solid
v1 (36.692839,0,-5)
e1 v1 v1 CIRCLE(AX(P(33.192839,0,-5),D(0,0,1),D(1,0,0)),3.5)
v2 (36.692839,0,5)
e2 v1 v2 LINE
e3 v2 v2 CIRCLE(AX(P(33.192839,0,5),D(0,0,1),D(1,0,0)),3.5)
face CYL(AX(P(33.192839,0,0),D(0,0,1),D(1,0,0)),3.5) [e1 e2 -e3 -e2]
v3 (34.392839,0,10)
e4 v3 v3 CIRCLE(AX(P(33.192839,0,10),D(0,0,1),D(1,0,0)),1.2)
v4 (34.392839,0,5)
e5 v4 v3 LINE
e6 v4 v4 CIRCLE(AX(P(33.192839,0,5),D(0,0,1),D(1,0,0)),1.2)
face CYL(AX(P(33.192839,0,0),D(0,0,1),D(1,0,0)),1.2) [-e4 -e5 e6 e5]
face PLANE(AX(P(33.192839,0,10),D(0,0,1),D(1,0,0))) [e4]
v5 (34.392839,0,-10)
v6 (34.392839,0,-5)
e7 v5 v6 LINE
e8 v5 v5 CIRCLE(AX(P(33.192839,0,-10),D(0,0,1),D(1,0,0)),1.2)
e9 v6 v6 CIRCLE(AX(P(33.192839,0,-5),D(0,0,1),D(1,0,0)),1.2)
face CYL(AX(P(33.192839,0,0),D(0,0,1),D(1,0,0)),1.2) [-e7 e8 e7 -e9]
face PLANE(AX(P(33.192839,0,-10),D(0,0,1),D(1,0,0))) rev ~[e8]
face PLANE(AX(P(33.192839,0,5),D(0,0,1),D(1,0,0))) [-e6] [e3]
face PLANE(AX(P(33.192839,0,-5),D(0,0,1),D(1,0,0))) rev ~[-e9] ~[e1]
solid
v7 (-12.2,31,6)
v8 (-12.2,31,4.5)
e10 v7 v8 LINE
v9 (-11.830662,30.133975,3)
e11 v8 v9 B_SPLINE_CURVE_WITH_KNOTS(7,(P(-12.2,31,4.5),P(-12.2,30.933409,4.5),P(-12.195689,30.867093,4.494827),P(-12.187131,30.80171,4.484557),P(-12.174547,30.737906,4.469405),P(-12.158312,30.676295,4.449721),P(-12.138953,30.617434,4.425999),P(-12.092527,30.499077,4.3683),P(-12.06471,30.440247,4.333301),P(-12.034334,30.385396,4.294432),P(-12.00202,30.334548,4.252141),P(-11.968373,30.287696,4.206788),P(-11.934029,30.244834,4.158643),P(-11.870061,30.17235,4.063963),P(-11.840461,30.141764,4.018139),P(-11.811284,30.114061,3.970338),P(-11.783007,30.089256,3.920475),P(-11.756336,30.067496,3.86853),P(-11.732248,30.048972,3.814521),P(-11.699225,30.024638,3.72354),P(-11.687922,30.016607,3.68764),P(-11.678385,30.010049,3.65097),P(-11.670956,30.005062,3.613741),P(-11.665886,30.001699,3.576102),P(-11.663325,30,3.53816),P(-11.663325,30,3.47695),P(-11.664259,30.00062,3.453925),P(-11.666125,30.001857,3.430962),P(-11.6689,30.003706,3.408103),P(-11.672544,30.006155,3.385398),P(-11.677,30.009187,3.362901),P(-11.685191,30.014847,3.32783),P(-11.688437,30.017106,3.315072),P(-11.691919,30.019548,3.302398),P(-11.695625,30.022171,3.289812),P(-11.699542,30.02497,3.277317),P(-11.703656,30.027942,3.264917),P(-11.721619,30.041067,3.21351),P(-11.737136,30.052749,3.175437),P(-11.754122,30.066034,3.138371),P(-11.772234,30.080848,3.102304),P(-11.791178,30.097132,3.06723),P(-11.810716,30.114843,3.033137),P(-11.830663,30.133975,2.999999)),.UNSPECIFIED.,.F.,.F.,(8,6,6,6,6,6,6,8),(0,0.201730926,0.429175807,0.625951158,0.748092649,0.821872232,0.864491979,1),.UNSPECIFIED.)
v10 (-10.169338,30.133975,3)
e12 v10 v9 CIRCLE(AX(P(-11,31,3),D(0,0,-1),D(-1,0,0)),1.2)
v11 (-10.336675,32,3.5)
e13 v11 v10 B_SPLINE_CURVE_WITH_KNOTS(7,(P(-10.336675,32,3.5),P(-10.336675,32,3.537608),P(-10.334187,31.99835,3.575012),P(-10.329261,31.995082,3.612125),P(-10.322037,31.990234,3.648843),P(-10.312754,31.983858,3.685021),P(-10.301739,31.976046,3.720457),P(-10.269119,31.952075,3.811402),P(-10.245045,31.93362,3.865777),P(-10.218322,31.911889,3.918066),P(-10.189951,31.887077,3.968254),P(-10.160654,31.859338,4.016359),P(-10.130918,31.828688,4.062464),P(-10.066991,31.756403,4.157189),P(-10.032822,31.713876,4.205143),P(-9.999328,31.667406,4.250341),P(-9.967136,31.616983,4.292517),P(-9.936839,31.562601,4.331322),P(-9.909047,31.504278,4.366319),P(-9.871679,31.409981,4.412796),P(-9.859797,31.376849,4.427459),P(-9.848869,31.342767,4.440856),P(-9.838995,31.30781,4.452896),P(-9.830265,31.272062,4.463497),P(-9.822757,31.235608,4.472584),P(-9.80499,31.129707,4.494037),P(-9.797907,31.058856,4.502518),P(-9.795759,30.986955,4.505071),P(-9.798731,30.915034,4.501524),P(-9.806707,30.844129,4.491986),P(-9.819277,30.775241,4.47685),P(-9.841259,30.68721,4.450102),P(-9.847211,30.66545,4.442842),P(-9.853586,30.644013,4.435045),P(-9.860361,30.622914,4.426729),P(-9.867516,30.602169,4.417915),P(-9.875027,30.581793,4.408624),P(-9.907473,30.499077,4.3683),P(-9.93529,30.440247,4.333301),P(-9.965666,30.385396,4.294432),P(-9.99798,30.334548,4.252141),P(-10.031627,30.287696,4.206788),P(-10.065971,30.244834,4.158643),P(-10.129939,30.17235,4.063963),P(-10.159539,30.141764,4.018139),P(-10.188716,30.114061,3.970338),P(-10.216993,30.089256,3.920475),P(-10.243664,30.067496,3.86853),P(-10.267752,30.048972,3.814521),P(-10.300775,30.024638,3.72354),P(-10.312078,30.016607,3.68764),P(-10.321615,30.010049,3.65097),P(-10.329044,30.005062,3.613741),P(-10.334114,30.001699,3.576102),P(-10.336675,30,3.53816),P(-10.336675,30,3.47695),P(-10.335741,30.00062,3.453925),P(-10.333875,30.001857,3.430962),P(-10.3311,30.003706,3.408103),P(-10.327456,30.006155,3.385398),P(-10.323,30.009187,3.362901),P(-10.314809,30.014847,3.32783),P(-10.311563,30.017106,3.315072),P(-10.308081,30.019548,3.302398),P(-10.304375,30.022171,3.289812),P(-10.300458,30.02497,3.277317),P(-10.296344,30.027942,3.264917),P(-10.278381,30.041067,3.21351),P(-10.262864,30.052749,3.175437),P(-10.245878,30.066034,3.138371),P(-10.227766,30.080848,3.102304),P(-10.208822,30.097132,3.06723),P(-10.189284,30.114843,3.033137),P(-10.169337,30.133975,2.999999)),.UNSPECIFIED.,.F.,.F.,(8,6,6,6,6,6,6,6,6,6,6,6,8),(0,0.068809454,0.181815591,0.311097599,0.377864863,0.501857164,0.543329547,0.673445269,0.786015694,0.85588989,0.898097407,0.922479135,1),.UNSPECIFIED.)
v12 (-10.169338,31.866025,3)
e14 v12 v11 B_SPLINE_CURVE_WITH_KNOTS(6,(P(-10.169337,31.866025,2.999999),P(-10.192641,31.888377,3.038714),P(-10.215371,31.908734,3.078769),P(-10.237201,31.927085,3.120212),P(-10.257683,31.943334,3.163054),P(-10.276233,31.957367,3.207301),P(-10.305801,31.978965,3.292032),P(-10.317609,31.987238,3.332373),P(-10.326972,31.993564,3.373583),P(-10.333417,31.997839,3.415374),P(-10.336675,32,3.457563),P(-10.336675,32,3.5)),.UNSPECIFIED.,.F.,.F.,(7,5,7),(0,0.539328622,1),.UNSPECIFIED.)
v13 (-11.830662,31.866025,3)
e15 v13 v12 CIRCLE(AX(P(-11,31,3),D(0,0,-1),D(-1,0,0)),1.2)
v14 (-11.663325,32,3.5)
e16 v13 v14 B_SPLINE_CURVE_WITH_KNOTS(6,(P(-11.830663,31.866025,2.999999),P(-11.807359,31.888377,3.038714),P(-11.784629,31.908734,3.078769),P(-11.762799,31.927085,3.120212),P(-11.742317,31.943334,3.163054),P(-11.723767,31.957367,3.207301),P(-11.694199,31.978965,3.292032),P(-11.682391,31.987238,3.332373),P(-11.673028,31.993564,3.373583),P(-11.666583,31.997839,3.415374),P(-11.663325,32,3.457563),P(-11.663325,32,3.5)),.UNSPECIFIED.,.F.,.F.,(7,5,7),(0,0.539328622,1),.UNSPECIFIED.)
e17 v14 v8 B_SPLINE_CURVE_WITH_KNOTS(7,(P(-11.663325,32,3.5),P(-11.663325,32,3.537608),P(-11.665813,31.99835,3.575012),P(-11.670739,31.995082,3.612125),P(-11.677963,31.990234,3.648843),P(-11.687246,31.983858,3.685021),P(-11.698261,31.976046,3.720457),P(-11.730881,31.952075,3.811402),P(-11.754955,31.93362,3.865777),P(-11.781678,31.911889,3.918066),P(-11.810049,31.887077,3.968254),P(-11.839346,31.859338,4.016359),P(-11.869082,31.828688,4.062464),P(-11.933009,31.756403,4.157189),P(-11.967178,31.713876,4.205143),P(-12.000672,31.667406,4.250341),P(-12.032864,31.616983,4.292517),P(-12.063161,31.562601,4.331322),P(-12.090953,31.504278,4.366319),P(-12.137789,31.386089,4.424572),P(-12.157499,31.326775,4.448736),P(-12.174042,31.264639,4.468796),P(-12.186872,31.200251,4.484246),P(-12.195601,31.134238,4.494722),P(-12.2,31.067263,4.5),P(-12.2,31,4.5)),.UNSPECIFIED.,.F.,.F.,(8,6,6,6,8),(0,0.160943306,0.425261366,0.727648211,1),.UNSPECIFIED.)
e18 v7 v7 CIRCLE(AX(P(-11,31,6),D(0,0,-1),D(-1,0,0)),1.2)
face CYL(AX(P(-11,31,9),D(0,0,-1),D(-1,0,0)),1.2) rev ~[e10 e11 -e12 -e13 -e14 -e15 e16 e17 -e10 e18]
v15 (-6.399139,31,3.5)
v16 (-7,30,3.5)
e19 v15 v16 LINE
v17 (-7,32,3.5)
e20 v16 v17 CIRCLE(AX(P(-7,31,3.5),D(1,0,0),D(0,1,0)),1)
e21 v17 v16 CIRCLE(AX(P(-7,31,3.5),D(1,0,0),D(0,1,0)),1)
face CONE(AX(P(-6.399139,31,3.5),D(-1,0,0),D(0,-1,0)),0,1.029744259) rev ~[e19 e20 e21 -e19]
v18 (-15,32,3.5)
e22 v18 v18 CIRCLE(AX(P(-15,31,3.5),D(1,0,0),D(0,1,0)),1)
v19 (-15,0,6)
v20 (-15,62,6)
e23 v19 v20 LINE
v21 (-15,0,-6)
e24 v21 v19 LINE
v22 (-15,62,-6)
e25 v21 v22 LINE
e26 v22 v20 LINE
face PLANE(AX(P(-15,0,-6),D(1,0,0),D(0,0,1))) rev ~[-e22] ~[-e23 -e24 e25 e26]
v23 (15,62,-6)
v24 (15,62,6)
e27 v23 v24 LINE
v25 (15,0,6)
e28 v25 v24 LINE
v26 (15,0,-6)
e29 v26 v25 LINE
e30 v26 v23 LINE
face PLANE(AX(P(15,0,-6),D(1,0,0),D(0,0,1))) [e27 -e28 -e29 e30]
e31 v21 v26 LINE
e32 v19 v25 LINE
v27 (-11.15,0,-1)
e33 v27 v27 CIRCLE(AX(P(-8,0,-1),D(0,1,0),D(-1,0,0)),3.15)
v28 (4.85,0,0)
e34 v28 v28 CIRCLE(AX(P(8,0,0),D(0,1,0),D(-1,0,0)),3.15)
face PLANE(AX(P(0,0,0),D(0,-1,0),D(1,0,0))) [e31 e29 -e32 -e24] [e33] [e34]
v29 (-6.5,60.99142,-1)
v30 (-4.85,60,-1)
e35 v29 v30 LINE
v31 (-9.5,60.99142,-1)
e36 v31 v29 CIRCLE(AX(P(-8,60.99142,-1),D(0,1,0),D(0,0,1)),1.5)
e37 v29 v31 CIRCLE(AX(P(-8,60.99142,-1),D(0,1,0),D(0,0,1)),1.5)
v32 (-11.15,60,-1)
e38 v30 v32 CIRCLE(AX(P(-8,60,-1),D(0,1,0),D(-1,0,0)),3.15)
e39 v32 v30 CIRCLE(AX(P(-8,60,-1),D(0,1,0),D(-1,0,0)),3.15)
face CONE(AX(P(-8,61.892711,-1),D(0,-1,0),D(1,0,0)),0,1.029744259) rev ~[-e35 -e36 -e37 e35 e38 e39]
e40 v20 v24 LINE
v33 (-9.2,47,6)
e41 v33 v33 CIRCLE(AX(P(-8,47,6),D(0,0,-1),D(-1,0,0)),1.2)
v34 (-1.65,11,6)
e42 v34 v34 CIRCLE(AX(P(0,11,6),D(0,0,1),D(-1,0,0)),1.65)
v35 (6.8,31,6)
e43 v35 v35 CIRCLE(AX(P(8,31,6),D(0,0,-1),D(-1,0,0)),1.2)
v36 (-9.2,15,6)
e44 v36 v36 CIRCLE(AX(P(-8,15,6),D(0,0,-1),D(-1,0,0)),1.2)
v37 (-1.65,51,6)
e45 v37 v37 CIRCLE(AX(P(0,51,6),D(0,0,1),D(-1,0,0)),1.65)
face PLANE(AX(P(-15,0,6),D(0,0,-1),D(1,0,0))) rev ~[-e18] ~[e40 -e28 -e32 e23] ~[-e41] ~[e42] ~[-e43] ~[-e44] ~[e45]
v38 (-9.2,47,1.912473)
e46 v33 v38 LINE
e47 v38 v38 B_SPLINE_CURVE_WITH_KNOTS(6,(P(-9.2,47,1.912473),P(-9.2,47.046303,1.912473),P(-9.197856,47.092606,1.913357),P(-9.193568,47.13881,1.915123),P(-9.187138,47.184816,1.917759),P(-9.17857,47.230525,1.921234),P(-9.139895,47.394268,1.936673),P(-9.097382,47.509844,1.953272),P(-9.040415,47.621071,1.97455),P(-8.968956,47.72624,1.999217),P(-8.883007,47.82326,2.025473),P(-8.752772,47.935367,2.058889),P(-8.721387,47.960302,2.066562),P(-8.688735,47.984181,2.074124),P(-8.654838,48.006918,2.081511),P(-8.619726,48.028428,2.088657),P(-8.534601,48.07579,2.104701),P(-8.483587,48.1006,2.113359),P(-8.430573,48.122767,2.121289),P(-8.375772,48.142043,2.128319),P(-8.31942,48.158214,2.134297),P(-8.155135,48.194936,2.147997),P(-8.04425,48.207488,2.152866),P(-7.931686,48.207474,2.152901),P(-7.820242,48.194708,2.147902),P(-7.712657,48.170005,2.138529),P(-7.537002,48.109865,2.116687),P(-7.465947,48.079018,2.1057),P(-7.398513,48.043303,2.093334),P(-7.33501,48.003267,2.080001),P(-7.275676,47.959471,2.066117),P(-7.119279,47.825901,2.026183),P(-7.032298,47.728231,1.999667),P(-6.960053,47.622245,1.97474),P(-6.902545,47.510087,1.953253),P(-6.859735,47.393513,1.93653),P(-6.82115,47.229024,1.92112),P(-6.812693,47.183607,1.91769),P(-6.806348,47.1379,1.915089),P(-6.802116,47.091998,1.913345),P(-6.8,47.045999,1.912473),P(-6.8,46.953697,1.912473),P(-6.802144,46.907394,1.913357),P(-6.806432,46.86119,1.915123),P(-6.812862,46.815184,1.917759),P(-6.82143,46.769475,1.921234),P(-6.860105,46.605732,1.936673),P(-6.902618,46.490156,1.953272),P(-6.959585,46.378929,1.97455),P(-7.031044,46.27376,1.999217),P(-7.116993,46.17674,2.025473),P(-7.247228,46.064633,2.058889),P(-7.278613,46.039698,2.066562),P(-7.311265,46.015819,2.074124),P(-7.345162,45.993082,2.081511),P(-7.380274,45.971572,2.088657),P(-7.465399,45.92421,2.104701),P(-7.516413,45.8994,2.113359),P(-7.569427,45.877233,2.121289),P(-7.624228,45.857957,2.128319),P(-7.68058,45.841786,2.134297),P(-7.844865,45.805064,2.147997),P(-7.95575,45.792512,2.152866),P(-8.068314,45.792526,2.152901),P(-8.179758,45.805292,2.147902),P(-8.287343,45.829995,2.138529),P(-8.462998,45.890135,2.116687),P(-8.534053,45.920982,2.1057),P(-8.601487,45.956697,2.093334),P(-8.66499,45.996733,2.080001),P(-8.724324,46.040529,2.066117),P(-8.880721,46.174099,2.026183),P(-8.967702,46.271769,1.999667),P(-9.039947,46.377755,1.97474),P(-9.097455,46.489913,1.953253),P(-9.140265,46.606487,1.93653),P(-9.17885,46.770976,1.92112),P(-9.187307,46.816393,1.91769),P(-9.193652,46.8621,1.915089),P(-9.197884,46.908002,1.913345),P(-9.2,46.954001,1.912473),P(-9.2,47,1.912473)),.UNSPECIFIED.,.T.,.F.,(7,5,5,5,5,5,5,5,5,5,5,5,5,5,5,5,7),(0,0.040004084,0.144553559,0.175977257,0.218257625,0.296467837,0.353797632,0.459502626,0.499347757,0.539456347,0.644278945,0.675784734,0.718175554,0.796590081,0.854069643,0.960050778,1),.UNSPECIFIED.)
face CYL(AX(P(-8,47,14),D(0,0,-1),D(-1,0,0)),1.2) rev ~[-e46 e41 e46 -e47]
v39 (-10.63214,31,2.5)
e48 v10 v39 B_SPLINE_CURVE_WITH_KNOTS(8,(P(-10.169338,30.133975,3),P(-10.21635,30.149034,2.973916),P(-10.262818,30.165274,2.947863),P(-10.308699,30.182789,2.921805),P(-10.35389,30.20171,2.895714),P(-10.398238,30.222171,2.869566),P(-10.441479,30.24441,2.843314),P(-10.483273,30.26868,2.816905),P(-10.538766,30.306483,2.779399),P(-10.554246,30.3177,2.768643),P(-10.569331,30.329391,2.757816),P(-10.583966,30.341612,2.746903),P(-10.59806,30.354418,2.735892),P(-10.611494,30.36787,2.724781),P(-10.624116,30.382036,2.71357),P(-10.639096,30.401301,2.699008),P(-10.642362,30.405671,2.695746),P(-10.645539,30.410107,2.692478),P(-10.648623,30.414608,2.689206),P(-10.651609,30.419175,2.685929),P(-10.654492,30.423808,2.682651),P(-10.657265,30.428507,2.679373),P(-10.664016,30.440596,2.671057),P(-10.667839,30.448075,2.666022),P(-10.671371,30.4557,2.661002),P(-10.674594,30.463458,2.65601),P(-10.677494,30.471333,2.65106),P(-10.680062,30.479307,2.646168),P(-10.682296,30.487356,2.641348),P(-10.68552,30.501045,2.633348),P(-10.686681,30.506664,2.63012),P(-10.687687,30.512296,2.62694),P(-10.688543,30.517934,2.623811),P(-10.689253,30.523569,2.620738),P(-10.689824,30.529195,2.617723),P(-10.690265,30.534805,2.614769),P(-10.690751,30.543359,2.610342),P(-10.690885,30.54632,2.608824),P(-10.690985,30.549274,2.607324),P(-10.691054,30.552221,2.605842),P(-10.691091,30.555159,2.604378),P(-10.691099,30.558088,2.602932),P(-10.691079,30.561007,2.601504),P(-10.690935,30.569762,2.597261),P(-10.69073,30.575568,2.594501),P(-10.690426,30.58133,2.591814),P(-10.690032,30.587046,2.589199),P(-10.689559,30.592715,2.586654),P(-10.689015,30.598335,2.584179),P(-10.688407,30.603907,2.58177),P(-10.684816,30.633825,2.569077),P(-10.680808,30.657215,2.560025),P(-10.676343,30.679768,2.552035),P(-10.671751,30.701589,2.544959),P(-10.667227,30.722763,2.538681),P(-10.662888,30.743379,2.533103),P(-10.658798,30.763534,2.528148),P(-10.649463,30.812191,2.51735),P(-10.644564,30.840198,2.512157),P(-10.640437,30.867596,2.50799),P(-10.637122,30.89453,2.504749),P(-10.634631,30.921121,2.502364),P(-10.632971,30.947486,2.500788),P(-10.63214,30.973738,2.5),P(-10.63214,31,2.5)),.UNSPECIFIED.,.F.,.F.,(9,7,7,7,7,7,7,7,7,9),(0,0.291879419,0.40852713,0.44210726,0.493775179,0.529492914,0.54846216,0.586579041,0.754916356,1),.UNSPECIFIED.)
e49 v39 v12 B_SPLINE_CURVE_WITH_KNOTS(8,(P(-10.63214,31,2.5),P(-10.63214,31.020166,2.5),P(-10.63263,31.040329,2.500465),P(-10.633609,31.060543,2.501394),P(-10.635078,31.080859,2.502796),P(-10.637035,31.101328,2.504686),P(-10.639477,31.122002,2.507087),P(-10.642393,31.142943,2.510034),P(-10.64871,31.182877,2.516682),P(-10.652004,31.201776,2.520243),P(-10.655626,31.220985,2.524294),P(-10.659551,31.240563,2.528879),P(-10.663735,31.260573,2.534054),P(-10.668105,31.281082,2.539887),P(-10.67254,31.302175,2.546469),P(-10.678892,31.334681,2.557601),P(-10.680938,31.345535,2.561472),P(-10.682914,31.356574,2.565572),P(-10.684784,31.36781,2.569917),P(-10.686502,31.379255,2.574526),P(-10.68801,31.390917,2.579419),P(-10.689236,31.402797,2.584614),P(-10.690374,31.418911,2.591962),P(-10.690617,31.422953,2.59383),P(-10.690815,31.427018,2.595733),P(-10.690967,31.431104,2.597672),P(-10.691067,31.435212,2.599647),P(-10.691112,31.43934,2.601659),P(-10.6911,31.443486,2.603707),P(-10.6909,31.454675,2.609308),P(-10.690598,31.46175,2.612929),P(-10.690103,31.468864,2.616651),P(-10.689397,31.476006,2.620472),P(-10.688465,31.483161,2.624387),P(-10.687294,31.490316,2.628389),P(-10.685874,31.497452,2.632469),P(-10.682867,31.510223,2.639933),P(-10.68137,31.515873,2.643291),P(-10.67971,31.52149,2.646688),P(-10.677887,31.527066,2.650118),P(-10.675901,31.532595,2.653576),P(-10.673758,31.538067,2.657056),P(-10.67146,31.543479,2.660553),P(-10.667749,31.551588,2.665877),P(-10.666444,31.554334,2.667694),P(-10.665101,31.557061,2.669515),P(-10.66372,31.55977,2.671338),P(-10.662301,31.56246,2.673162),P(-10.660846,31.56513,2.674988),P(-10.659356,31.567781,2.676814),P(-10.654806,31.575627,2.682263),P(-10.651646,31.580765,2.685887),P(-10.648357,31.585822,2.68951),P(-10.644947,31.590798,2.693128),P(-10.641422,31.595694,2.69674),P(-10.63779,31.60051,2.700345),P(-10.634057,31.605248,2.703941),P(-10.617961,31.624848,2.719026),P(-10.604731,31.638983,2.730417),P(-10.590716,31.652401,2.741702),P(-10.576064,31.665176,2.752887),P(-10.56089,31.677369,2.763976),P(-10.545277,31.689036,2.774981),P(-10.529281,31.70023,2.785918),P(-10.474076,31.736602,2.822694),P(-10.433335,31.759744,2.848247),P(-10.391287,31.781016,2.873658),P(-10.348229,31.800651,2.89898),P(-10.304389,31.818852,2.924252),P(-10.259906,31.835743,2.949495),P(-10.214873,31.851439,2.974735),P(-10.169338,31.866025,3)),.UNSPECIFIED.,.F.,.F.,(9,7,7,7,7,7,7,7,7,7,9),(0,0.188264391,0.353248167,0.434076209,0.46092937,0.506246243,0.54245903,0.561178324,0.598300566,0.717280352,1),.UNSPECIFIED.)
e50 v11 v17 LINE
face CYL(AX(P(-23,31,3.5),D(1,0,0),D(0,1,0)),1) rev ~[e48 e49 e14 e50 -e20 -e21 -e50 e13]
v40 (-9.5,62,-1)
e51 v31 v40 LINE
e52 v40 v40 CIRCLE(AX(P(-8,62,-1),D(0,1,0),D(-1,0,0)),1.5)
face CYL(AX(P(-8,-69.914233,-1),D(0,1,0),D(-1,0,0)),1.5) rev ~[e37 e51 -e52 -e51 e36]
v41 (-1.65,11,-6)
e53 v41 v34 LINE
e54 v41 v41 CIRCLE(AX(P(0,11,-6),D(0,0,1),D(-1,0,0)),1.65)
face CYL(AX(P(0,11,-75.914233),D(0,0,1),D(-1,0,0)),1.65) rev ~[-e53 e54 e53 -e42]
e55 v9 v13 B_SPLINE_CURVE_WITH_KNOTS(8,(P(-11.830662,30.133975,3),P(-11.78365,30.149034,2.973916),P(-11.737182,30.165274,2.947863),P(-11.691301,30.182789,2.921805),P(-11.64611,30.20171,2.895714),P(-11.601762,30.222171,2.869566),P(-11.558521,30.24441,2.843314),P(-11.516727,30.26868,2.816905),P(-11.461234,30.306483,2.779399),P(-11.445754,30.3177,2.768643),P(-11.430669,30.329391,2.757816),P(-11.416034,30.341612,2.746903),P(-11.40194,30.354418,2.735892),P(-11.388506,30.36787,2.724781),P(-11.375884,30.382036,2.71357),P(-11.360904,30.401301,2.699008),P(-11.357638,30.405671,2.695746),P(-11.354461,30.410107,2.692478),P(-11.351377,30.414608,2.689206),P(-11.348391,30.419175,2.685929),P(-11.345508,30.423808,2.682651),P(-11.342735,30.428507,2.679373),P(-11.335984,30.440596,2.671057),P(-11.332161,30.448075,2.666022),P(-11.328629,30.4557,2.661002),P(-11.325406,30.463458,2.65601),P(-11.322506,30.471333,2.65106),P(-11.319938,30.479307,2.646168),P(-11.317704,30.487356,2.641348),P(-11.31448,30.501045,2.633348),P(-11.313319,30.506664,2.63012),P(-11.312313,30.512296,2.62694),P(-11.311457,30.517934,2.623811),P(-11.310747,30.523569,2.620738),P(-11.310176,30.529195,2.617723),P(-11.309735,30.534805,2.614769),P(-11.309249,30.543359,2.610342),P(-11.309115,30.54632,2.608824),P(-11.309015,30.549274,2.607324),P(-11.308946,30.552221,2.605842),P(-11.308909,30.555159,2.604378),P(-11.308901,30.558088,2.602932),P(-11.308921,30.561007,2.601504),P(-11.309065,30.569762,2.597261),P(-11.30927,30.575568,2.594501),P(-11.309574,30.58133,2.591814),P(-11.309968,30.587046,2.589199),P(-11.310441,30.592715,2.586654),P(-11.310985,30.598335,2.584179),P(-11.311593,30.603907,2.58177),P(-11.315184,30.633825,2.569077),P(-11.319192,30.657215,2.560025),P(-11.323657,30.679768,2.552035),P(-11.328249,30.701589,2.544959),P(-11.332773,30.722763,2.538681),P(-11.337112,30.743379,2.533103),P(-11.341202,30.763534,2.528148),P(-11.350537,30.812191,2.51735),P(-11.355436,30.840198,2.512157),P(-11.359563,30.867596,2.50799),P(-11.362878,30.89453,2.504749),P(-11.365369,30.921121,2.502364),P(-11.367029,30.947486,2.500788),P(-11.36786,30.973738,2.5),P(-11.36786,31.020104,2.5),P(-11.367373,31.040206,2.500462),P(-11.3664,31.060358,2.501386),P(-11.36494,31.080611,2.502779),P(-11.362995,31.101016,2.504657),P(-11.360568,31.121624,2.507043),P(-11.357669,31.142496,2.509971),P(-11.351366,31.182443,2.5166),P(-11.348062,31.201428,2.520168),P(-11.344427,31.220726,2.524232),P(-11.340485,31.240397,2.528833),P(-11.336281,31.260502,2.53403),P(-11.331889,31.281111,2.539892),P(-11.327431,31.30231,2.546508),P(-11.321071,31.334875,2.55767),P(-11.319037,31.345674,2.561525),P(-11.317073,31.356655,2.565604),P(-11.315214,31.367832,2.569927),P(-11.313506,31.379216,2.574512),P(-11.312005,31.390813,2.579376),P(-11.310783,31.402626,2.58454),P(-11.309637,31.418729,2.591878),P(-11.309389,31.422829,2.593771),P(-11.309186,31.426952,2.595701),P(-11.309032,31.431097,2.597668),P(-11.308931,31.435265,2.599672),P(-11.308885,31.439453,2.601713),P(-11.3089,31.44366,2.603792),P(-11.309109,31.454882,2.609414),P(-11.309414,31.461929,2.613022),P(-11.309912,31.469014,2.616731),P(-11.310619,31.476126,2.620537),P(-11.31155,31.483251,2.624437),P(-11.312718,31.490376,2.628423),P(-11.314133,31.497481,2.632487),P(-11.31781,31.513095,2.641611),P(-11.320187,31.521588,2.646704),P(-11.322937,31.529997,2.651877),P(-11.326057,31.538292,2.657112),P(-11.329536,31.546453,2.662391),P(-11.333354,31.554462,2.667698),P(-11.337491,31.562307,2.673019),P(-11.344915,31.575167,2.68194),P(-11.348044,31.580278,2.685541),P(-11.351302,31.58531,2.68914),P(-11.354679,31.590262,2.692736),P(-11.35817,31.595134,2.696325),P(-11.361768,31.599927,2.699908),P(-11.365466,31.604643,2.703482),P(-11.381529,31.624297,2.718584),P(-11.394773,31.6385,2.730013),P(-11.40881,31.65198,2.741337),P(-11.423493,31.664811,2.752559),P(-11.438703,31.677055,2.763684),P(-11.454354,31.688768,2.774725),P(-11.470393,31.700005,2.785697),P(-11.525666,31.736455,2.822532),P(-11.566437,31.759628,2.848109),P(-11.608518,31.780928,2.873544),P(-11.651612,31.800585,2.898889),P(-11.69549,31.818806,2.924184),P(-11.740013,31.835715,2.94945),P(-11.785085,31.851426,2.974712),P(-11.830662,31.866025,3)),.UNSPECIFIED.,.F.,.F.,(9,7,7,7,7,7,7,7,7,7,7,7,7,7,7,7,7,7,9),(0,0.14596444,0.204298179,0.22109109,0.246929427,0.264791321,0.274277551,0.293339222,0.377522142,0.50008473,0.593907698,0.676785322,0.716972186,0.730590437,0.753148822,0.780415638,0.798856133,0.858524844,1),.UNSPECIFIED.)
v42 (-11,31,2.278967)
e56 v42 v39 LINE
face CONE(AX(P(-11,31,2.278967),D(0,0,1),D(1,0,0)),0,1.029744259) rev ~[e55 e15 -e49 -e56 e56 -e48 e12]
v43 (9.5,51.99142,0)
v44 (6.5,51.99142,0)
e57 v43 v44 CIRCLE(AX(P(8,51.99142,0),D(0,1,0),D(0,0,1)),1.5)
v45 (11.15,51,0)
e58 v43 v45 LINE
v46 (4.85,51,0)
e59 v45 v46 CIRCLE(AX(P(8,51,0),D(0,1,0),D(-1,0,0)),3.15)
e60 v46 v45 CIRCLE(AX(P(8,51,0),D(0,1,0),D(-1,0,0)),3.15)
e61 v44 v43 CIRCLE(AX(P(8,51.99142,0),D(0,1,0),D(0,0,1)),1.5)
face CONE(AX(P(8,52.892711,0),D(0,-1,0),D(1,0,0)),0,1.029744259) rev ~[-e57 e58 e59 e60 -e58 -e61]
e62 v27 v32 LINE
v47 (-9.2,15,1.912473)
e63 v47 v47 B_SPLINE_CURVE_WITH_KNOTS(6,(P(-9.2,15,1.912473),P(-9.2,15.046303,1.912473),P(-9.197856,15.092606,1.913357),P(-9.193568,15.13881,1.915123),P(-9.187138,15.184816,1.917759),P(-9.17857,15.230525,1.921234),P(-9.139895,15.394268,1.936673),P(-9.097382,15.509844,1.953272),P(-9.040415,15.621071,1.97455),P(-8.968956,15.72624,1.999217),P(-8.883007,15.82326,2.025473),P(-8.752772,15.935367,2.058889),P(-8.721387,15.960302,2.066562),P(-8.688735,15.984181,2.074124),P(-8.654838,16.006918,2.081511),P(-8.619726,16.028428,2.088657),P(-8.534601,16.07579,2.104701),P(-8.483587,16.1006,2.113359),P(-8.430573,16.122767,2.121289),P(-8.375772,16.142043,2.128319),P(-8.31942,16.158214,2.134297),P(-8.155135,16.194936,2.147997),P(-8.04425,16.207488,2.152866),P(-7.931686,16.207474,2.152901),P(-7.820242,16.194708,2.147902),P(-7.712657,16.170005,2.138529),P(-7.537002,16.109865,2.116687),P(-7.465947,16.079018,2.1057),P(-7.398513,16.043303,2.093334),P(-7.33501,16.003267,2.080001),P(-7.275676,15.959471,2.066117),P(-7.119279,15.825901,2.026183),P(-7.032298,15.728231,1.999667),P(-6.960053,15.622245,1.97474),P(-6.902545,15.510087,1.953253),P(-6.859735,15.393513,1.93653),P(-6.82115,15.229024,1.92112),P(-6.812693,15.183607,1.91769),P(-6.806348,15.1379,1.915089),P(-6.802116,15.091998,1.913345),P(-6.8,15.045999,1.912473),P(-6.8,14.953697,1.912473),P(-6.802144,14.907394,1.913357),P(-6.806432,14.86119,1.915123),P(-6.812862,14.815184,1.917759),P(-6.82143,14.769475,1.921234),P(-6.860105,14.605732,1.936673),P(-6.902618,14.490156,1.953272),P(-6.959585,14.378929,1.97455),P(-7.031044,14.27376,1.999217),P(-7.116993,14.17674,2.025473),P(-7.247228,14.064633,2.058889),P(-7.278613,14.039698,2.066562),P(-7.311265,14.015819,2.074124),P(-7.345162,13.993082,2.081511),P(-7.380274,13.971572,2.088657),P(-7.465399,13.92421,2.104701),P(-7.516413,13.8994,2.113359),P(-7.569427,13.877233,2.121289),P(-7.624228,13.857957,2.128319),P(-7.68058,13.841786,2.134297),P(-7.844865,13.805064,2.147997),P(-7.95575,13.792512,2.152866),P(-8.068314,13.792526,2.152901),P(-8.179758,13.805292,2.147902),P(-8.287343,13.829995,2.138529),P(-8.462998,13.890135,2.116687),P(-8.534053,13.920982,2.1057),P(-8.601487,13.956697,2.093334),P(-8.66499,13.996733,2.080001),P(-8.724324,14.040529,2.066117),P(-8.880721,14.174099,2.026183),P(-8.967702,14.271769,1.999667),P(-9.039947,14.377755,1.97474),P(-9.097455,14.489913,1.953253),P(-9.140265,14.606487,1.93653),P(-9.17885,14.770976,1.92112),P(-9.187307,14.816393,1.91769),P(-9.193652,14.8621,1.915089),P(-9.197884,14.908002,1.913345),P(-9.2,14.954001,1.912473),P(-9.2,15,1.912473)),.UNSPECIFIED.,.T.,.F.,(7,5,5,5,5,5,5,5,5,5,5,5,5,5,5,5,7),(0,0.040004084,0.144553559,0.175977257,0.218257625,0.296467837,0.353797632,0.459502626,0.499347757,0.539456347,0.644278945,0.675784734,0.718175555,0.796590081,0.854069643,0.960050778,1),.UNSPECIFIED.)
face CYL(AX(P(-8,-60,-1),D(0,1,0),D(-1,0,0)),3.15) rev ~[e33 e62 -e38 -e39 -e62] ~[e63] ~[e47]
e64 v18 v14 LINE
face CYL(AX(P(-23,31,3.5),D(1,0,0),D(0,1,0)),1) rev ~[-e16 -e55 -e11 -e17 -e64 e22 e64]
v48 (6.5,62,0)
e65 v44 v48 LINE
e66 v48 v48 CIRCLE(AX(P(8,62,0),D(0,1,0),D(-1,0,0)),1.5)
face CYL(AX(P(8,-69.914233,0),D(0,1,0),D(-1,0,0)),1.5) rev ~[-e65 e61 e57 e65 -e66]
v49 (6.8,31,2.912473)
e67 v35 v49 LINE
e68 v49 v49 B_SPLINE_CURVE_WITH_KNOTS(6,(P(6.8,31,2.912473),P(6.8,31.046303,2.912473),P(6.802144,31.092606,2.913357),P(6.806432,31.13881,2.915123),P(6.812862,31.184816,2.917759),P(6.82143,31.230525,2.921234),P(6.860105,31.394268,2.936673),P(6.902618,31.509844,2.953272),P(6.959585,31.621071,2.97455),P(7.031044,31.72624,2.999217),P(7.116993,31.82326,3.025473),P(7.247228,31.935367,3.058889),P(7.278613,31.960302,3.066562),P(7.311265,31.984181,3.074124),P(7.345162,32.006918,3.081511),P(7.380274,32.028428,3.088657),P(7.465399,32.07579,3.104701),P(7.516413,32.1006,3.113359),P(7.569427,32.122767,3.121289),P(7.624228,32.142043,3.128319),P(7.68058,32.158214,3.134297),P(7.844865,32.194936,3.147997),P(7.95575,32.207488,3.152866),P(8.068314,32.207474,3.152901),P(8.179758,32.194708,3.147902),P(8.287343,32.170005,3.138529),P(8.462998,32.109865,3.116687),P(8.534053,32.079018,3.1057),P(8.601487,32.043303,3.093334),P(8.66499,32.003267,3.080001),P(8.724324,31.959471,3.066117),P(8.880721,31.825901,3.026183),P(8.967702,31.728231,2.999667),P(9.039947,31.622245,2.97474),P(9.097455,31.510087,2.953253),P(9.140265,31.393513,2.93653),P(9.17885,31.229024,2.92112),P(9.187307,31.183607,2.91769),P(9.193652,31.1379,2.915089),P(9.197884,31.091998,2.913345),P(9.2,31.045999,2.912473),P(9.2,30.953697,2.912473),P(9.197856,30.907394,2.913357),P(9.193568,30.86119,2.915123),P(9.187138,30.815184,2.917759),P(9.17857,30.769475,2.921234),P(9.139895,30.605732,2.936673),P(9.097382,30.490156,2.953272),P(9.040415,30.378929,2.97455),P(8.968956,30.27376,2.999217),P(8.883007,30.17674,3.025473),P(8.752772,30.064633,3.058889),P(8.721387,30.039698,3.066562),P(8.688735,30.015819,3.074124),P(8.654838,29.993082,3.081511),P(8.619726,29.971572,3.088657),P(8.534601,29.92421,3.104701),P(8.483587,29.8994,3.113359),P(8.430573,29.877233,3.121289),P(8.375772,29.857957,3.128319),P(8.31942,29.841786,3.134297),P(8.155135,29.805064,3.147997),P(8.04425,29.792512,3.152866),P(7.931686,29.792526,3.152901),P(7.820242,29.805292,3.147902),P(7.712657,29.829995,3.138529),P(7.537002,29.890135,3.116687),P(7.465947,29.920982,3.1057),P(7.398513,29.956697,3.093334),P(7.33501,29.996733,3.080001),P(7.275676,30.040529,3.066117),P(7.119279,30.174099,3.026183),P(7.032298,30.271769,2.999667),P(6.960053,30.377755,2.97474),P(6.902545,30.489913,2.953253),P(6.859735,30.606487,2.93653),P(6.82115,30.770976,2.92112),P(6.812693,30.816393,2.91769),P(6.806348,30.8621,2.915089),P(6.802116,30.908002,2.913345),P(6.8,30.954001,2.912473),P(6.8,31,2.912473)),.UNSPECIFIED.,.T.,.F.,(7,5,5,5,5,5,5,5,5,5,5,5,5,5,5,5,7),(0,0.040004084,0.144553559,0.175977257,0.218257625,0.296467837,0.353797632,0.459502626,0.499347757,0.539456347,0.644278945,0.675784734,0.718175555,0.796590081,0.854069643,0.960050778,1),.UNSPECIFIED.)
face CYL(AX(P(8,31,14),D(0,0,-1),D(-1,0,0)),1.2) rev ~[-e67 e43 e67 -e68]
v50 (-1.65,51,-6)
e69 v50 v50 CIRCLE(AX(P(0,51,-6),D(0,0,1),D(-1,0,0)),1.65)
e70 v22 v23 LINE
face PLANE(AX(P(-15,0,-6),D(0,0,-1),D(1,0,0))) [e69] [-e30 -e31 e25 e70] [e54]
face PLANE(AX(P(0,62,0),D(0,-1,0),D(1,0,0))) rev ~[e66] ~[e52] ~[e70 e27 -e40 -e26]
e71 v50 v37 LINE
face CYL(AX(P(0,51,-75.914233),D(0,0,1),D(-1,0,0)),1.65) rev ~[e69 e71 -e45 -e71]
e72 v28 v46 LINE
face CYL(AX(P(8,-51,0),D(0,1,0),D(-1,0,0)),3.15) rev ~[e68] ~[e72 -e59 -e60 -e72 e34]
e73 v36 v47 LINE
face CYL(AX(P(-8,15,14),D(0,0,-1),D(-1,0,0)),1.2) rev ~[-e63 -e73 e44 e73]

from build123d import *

# Parameters (mm, degrees)
F0_W      = 30
F0_H      = 12
F1_DEPTH  = 62
F2_D      = 6.3
F2_DEPTH  = 60
F2_TIP    = 1.8927109499
F3_D      = 6.3
F3_DEPTH  = 51
F3_TIP    = 1.8927109499
F5_D      = 3.3
F6_R      = 1.2
F7_DEPTH  = 10
F6_R_2    = 3.5
F8_DEPTH  = 5
F10_D     = 2
F10_DEPTH = 8
F10_TIP   = 0.600860619
F12_D     = 2.4
F12_DEPTH = 8
F12_TIP   = 0.7210327428
F13_D     = 2.4
F13_DEPTH = 3
F13_TIP   = 0.7210327428
F14_D     = 3


# Not quite as in the source:
# - a feature names something its author has since deleted; it is built from what else it names


with BuildPart() as f1:
    # F0 (on Front) → F1 (new body)
    with BuildSketch(Plane.XZ):
        Rectangle(F0_W, F0_H)
    extrude(amount=-F1_DEPTH)

    # F2
    with Locations(Plane.XZ):
        with Locations((-8, -1)):
            Hole(F2_D / 2, depth=F2_DEPTH)
            with Locations((0, 0, -(F2_DEPTH + F2_TIP / 2))):  # 118° drill point
                Cone(0, F2_D / 2, F2_TIP, mode=Mode.SUBTRACT)

    # F3
    with Locations(Plane.XZ):
        with Locations((8, 0)):
            Hole(F3_D / 2, depth=F3_DEPTH)
            with Locations((0, 0, -(F3_DEPTH + F3_TIP / 2))):  # 118° drill point
                Cone(0, F3_D / 2, F3_TIP, mode=Mode.SUBTRACT)

    # F5 (through all)
    with Locations(Plane(origin=(0, 0, -6), x_dir=(1, 0, 0), z_dir=(0, 0, -1))):
        with Locations((0, -11), (0, -51)):
            Hole(F5_D / 2)

    # F10
    with Locations(Plane(origin=(-15, 0, 0), x_dir=(0, -1, 0), z_dir=(-1, 0, 0))):
        with Locations((-31, 3.5)):
            Hole(F10_D / 2, depth=F10_DEPTH)
            with Locations((0, 0, -(F10_DEPTH + F10_TIP / 2))):  # 118° drill point
                Cone(0, F10_D / 2, F10_TIP, mode=Mode.SUBTRACT)

    # F12
    with Locations(Plane.XY.offset(6)):
        with Locations((-8, 15), (-8, 47), (8, 31)):
            Hole(F12_D / 2, depth=F12_DEPTH)
            with Locations((0, 0, -(F12_DEPTH + F12_TIP / 2))):  # 118° drill point
                Cone(0, F12_D / 2, F12_TIP, mode=Mode.SUBTRACT)

    # F13
    with Locations(Plane.XY.offset(6)):
        with Locations((-11, 31)):
            Hole(F13_D / 2, depth=F13_DEPTH)
            with Locations((0, 0, -(F13_DEPTH + F13_TIP / 2))):  # 118° drill point
                Cone(0, F13_D / 2, F13_TIP, mode=Mode.SUBTRACT)

    # F14 (through all)
    with Locations(Plane.XZ):
        with Locations((-8, -1), (8, 0)):
            Hole(F14_D / 2)


with BuildPart() as f7:
    # F6 (on Top) → F7 (new body, symmetric)
    with BuildSketch(Plane.XY):
        with Locations((33.1928394735, 0)):
            Circle(F6_R)
    extrude(amount=F7_DEPTH, both=True)

    # F6 (on Top) → F8 (join, symmetric)
    with BuildSketch(Plane.XY):
        with Locations((33.1928394735, 0)):
            Circle(F6_R_2)
        with Locations((33.1928394735, 0)):
            Circle(F6_R, mode=Mode.SUBTRACT)
    extrude(amount=F8_DEPTH, both=True)


solid = Compound([f1.part, f7.part])
